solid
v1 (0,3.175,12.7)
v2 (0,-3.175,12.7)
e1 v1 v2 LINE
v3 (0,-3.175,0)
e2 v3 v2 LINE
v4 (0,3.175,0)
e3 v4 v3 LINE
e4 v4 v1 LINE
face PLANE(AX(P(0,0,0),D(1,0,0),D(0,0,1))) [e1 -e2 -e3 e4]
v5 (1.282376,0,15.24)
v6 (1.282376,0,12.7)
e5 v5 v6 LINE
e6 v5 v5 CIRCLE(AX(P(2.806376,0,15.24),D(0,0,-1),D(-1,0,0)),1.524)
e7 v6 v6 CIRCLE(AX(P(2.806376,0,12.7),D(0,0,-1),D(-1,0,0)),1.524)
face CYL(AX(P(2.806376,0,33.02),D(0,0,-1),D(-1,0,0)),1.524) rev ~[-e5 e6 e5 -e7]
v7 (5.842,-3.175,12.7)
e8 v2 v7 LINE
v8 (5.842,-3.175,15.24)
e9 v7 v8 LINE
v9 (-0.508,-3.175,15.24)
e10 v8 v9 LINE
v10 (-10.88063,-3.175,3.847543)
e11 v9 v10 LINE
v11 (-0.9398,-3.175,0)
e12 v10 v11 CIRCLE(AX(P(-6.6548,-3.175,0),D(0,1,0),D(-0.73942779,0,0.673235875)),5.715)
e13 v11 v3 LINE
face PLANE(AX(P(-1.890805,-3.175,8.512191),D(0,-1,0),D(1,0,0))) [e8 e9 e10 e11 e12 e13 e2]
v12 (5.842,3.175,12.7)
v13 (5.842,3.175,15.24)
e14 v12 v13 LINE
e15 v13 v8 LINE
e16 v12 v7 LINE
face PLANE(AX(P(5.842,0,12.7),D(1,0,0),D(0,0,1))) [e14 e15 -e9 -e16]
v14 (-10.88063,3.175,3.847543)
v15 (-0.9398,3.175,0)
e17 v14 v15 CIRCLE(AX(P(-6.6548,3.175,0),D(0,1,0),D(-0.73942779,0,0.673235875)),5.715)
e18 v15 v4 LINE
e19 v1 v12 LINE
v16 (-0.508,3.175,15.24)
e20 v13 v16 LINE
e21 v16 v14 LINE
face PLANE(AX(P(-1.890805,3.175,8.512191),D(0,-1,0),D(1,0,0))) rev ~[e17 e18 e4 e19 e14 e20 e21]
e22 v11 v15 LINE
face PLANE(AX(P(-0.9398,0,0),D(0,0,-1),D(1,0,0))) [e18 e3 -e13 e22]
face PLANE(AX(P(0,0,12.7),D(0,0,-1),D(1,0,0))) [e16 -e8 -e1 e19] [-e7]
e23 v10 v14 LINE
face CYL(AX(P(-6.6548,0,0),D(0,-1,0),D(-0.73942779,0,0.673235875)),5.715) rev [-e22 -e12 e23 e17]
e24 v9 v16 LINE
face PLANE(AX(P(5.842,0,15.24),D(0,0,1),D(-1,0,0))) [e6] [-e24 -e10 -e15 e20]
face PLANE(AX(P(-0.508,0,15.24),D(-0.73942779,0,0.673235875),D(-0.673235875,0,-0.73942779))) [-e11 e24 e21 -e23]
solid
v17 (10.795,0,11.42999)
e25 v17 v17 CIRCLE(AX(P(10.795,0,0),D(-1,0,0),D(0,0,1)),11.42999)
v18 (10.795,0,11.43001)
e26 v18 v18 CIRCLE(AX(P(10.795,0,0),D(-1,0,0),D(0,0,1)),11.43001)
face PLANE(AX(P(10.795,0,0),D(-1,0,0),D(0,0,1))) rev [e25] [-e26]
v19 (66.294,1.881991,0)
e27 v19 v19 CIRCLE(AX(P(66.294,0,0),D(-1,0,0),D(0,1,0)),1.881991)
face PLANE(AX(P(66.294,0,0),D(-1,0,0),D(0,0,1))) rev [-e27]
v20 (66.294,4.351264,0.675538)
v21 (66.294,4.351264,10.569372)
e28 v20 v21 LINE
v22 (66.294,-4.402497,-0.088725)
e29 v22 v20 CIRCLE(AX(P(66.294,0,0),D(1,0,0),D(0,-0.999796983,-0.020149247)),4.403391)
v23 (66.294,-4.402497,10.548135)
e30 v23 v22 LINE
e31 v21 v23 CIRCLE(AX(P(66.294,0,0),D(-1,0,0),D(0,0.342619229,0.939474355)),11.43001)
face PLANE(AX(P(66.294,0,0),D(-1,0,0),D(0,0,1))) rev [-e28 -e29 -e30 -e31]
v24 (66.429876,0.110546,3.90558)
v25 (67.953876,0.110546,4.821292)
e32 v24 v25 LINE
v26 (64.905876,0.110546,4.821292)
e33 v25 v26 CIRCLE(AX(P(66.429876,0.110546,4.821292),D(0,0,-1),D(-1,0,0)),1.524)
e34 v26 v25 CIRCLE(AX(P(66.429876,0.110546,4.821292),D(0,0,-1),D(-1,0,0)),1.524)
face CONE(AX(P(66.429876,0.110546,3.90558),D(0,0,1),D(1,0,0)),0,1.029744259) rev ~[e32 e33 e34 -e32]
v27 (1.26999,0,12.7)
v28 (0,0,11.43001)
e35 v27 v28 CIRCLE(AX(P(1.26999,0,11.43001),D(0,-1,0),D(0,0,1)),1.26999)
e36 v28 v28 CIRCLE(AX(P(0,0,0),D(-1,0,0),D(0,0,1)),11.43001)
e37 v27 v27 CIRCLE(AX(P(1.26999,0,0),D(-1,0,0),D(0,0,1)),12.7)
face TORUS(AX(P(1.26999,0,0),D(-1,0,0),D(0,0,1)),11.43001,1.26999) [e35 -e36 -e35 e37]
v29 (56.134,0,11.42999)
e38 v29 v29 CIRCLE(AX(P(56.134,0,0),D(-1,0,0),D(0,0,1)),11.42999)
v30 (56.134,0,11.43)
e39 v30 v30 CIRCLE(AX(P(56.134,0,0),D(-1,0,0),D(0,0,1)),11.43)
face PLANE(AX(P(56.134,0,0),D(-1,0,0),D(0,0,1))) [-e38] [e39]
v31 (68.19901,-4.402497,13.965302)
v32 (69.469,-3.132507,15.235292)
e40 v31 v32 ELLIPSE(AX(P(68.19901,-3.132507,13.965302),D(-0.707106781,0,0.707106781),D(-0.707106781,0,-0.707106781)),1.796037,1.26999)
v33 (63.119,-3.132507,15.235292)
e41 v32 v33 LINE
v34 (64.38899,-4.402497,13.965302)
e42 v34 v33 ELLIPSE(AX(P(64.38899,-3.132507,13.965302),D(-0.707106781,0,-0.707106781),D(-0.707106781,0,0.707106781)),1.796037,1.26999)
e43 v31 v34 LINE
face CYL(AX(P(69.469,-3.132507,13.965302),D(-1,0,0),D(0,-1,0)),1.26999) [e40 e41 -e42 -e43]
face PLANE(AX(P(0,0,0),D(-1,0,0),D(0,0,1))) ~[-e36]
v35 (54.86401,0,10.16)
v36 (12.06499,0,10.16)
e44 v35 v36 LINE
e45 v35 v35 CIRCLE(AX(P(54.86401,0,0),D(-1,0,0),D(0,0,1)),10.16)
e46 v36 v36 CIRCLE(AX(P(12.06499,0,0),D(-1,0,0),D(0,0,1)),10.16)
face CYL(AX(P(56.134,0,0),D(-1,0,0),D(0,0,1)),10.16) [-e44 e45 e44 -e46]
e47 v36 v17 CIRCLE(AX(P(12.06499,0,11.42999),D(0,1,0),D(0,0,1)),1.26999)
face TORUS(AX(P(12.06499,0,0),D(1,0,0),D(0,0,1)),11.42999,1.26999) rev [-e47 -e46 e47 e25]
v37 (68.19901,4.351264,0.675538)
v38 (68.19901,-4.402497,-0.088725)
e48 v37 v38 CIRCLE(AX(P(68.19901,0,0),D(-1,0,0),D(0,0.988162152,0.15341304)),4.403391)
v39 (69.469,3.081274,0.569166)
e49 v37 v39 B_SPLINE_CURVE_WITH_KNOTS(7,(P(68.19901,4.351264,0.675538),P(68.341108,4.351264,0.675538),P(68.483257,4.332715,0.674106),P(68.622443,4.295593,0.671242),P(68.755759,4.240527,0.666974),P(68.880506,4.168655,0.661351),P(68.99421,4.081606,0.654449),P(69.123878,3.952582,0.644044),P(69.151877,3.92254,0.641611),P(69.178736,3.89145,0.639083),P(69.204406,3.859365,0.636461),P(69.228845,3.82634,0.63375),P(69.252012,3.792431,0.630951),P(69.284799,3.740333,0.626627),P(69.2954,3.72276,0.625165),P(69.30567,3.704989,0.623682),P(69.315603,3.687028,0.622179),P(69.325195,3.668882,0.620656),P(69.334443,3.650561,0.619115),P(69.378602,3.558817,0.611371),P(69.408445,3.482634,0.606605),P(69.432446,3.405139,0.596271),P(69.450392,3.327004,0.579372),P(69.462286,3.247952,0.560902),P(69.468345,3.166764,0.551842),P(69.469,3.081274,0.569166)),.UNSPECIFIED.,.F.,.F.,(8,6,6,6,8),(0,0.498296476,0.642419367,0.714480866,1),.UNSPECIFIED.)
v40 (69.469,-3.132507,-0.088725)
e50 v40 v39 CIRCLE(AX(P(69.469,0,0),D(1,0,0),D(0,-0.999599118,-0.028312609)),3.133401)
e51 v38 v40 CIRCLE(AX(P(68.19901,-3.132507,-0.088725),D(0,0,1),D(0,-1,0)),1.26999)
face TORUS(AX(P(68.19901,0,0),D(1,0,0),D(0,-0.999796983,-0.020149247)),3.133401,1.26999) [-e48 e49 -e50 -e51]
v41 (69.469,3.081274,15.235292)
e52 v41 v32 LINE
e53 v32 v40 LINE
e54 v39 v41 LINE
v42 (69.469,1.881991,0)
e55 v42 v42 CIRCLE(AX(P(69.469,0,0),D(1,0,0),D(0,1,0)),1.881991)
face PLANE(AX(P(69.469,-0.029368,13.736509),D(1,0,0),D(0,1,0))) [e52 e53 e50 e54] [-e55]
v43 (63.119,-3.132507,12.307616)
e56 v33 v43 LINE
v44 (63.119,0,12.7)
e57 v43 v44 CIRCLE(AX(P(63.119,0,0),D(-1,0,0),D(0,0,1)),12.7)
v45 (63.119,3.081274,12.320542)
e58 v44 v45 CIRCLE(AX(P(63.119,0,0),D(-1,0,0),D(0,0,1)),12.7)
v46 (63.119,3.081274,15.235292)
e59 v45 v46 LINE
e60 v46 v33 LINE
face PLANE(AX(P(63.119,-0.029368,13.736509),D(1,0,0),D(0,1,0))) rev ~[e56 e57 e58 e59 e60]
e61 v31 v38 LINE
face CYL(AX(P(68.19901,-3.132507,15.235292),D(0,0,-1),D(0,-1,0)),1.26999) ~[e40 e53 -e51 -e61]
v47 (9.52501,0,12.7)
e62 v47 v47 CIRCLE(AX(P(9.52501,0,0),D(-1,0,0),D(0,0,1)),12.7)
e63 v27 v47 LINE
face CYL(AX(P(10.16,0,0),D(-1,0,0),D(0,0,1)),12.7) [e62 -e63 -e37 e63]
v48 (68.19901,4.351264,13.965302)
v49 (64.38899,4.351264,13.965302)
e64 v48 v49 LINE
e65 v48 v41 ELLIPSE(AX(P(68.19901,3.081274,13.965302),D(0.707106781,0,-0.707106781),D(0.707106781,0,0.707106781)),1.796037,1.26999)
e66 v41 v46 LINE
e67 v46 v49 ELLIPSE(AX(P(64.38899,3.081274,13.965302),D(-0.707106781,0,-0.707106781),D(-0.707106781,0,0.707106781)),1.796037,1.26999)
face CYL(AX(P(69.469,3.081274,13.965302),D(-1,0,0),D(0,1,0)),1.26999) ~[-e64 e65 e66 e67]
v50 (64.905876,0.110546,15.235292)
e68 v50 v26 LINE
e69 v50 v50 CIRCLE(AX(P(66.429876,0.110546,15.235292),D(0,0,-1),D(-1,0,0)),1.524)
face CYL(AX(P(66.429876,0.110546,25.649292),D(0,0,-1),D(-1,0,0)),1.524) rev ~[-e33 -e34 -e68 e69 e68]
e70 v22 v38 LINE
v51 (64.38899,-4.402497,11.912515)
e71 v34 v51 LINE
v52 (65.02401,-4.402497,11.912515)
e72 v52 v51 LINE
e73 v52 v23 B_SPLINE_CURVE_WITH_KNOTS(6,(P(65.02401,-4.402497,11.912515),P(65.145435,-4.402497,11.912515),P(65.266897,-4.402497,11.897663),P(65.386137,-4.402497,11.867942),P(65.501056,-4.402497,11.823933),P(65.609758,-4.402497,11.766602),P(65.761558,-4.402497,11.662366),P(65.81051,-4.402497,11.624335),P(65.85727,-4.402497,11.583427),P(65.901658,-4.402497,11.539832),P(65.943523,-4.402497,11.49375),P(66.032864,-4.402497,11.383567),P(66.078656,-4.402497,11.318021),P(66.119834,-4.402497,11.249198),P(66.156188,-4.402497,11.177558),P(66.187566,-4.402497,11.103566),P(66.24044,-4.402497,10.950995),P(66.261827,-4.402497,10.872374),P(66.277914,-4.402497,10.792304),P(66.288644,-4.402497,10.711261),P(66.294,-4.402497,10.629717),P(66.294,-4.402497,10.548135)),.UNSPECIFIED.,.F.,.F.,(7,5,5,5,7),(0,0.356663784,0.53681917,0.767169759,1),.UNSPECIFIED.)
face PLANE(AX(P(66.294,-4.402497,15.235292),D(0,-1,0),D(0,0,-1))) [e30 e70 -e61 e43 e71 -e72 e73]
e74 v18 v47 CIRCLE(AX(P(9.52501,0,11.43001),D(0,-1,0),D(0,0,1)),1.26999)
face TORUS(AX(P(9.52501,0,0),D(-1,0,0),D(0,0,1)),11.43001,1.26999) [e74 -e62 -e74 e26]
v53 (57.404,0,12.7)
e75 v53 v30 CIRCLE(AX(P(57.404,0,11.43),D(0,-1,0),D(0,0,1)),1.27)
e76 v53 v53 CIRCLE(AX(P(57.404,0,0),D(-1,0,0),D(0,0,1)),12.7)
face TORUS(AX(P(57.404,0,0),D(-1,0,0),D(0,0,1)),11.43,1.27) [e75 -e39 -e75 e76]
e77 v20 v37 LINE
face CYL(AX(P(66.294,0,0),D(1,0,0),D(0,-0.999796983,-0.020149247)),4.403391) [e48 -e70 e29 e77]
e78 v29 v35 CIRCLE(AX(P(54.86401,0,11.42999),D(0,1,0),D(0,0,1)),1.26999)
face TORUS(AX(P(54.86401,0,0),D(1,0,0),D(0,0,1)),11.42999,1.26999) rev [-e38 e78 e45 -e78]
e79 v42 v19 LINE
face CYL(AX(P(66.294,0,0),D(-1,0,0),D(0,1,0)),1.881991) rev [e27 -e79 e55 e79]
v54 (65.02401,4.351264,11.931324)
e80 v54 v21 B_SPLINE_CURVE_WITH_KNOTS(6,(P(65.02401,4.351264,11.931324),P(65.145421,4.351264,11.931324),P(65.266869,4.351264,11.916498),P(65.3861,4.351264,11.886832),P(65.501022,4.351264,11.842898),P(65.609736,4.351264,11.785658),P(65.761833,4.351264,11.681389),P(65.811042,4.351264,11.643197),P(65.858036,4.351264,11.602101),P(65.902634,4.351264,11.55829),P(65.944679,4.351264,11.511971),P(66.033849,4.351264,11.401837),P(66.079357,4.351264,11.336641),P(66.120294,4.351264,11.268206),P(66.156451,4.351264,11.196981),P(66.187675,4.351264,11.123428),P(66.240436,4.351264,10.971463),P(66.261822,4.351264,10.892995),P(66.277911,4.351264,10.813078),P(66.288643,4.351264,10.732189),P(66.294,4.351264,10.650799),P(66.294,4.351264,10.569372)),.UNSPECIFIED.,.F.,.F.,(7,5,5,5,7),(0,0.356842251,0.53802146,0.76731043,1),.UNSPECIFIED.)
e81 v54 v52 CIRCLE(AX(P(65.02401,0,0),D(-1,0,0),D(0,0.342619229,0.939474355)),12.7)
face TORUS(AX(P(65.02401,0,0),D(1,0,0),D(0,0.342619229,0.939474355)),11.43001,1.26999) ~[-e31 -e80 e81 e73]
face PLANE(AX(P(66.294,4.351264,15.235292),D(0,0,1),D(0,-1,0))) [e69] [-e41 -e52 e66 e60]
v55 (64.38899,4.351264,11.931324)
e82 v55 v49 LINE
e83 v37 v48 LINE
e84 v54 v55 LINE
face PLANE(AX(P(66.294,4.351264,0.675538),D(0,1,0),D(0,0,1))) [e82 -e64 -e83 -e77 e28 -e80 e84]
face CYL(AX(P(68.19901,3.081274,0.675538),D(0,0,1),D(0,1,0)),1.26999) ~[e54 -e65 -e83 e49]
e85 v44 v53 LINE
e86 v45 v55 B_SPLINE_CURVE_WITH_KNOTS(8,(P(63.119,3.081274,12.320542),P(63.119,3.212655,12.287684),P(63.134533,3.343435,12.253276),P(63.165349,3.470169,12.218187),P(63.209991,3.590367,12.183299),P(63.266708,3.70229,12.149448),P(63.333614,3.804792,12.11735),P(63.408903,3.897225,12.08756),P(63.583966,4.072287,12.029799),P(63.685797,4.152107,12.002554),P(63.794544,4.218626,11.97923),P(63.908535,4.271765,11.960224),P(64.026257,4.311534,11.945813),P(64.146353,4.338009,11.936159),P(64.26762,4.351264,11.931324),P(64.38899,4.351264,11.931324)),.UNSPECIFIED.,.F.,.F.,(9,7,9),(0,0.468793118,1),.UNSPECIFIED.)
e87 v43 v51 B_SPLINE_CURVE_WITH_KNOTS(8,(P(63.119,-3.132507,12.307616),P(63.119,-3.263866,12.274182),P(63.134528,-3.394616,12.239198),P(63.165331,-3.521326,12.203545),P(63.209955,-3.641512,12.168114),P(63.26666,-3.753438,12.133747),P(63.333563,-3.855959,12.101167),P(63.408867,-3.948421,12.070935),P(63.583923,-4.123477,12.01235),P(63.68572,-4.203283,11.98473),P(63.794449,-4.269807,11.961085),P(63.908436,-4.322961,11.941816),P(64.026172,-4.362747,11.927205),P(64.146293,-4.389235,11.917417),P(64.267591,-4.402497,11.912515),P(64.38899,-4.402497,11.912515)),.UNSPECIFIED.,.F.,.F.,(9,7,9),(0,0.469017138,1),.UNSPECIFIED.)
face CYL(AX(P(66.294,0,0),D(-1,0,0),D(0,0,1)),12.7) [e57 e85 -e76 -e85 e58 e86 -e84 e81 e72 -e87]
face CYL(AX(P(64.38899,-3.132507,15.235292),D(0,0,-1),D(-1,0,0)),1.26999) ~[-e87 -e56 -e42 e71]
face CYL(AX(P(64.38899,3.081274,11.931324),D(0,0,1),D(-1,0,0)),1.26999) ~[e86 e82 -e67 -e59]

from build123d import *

# Parameters (mm, degrees)
F0_W     = 5.842
F0_H     = 12.7
F2_DEPTH = 3.175
F3_DEPTH = 0.635
F5_D     = 3.048
F5_DEPTH = 17.78
F5_TIP   = 0.9157115834
F6_R     = 1.8819905546
F7_DEPTH = 3.175
F9_D     = 3.048
F9_DEPTH = 10.414
F9_TIP   = 0.9157115834
F10_R    = 1.27
F11_R    = 1.26999


# Not quite as in the source:
# - two fillets or chamfers of one size are made in one step
# - a fillet or chamfer is up to 0.001 mm smaller than in the source, because OpenCascade refuses the exact size
# - a feature of the source that left no trace in its solid (it failed there, or was rolled back) is left out


with BuildPart() as f1:
    # F0 (on Front) → F1 (revolve)
    with BuildSketch(Plane.XZ):
        Polygon((5.842, 12.7), (5.842, 0), (66.294, 0), (66.294, 12.7), (56.134, 12.7), (56.134, 10.16), (10.16, 10.16), (10.16, 12.7), align=None)
        with Locations((2.921, 6.35)):
            Rectangle(F0_W, F0_H)
    revolve(axis=Axis((33.147, 0, 0), (-1, 0, 0)))

    # F3 (add, symmetric): a face of the model
    f3_faces = [f1.faces().sort_by_distance(p)[0] for p in [
        (10.16, 0, -10.5192102448),
    ]]
    extrude(f3_faces, amount=F3_DEPTH, both=True)

    # F6 (on face) → F7 (join, symmetric)
    with BuildSketch(Plane.YZ.offset(66.294)):
        with BuildLine():
            Line((-4.4024969223, 15.2352917939), (-4.4024969223, 11.9125153032))
            ThreePointArc((-4.4024969223, 11.9125153032), (-0.0272881349, 12.6999706833), (4.3512642127, 11.9313243084))
            Line((4.3512642127, 11.9313243084), (4.3512642127, 15.2352917939))
            Line((4.3512642127, 15.2352917939), (-0.0256163548, 15.2352917939))
            Line((-0.0256163548, 15.2352917939), (-4.4024969223, 15.2352917939))
        make_face()
        with BuildLine():
            Line((-4.4024969223, 11.9125153032), (-4.4024969223, 0.0887250123))
            ThreePointArc((-4.4024969223, 0.0887250123), (-0.2945224047, 4.3935302243), (4.3512642127, 0.6755375863))
            Line((4.3512642127, 0.6755375863), (4.3512642127, 11.9313243084))
            ThreePointArc((4.3512642127, 11.9313243084), (-0.0272881349, 12.6999706833), (-4.4024969223, 11.9125153032))
        make_face()
        with BuildLine():
            Line((-4.4024969223, 0.0887250123), (-4.4024969223, -0.0887250123))
            ThreePointArc((-4.4024969223, -0.0887250123), (0.0443647579, -4.403167388), (4.4033908842, 0))
            ThreePointArc((4.4033908842, 0), (4.3903398756, 0.3387728665), (4.3512642127, 0.6755375863))
            ThreePointArc((4.3512642127, 0.6755375863), (-0.2945224047, 4.3935302243), (-4.4024969223, 0.0887250123))
        make_face()
        Circle(F6_R, mode=Mode.SUBTRACT)
    extrude(amount=F7_DEPTH, both=True)

    # F9
    with Locations(Plane.XY.offset(15.2352917939)):
        with Locations((66.4298757911, 0.1105455449)):
            Hole(F9_D / 2, depth=F9_DEPTH)
            with Locations((0, 0, -(F9_DEPTH + F9_TIP / 2))):  # 118° drill point
                Cone(0, F9_D / 2, F9_TIP, mode=Mode.SUBTRACT)

    # F10
    f10_edges = [f1.edges().sort_by_distance(p)[0] for p in [
        (56.134, 0, -12.7),
    ]]
    fillet(f10_edges, radius=F10_R)

    # F11 (radius 1.27 in the source; OpenCascade refuses exactly that, so slightly less here)
    f11_edges = [f1.edges().sort_by_distance(p)[0] for p in [
        (10.795, 0, -12.7),
        (66.294, -4.402497, 15.235292),
        (63.119, -4.402497, 13.573904),
        (33.4645, 0, 10.16),
        (10.795, 0, -10.16),
        (56.134, 0, -10.16),
        (69.469, -4.402497, 7.573283),
        (66.294, 0.027288, -12.699971),
        (63.119, 4.351264, 13.583308),
        (69.469, 4.351264, 7.955415),
        (66.294, 4.351264, 15.235292),
        (69.469, 0.382989, -4.386704),
        (0, 0, -12.7),
    ]]
    fillet(f11_edges, radius=F11_R)


with BuildPart() as f2:
    # F0 (on Front) → F2 (new body, symmetric)
    with BuildSketch(Plane.XZ):
        with BuildLine():
            Line((-0.9398, 0), (0, 0))
            Line((0, 0), (0, 12.7))
            Line((0, 12.7), (5.842, 12.7))
            Line((5.842, 12.7), (5.842, 15.24))
            Line((5.842, 15.24), (-0.508, 15.24))
            Line((-0.508, 15.24), (-10.8806298187, 3.8475430269))
            ThreePointArc((-10.8806298187, 3.8475430269), (-4.5919612295, 5.3297205562), (-0.9398, 0))
        make_face()
    extrude(amount=F2_DEPTH, both=True)

    # F5
    with Locations(Plane.XY.offset(15.24)):
        with Locations((2.8063759673, 0)):
            Hole(F5_D / 2, depth=F5_DEPTH)
            with Locations((0, 0, -(F5_DEPTH + F5_TIP / 2))):  # 118° drill point
                Cone(0, F5_D / 2, F5_TIP, mode=Mode.SUBTRACT)


solid = Compound([f1.part, f2.part])
